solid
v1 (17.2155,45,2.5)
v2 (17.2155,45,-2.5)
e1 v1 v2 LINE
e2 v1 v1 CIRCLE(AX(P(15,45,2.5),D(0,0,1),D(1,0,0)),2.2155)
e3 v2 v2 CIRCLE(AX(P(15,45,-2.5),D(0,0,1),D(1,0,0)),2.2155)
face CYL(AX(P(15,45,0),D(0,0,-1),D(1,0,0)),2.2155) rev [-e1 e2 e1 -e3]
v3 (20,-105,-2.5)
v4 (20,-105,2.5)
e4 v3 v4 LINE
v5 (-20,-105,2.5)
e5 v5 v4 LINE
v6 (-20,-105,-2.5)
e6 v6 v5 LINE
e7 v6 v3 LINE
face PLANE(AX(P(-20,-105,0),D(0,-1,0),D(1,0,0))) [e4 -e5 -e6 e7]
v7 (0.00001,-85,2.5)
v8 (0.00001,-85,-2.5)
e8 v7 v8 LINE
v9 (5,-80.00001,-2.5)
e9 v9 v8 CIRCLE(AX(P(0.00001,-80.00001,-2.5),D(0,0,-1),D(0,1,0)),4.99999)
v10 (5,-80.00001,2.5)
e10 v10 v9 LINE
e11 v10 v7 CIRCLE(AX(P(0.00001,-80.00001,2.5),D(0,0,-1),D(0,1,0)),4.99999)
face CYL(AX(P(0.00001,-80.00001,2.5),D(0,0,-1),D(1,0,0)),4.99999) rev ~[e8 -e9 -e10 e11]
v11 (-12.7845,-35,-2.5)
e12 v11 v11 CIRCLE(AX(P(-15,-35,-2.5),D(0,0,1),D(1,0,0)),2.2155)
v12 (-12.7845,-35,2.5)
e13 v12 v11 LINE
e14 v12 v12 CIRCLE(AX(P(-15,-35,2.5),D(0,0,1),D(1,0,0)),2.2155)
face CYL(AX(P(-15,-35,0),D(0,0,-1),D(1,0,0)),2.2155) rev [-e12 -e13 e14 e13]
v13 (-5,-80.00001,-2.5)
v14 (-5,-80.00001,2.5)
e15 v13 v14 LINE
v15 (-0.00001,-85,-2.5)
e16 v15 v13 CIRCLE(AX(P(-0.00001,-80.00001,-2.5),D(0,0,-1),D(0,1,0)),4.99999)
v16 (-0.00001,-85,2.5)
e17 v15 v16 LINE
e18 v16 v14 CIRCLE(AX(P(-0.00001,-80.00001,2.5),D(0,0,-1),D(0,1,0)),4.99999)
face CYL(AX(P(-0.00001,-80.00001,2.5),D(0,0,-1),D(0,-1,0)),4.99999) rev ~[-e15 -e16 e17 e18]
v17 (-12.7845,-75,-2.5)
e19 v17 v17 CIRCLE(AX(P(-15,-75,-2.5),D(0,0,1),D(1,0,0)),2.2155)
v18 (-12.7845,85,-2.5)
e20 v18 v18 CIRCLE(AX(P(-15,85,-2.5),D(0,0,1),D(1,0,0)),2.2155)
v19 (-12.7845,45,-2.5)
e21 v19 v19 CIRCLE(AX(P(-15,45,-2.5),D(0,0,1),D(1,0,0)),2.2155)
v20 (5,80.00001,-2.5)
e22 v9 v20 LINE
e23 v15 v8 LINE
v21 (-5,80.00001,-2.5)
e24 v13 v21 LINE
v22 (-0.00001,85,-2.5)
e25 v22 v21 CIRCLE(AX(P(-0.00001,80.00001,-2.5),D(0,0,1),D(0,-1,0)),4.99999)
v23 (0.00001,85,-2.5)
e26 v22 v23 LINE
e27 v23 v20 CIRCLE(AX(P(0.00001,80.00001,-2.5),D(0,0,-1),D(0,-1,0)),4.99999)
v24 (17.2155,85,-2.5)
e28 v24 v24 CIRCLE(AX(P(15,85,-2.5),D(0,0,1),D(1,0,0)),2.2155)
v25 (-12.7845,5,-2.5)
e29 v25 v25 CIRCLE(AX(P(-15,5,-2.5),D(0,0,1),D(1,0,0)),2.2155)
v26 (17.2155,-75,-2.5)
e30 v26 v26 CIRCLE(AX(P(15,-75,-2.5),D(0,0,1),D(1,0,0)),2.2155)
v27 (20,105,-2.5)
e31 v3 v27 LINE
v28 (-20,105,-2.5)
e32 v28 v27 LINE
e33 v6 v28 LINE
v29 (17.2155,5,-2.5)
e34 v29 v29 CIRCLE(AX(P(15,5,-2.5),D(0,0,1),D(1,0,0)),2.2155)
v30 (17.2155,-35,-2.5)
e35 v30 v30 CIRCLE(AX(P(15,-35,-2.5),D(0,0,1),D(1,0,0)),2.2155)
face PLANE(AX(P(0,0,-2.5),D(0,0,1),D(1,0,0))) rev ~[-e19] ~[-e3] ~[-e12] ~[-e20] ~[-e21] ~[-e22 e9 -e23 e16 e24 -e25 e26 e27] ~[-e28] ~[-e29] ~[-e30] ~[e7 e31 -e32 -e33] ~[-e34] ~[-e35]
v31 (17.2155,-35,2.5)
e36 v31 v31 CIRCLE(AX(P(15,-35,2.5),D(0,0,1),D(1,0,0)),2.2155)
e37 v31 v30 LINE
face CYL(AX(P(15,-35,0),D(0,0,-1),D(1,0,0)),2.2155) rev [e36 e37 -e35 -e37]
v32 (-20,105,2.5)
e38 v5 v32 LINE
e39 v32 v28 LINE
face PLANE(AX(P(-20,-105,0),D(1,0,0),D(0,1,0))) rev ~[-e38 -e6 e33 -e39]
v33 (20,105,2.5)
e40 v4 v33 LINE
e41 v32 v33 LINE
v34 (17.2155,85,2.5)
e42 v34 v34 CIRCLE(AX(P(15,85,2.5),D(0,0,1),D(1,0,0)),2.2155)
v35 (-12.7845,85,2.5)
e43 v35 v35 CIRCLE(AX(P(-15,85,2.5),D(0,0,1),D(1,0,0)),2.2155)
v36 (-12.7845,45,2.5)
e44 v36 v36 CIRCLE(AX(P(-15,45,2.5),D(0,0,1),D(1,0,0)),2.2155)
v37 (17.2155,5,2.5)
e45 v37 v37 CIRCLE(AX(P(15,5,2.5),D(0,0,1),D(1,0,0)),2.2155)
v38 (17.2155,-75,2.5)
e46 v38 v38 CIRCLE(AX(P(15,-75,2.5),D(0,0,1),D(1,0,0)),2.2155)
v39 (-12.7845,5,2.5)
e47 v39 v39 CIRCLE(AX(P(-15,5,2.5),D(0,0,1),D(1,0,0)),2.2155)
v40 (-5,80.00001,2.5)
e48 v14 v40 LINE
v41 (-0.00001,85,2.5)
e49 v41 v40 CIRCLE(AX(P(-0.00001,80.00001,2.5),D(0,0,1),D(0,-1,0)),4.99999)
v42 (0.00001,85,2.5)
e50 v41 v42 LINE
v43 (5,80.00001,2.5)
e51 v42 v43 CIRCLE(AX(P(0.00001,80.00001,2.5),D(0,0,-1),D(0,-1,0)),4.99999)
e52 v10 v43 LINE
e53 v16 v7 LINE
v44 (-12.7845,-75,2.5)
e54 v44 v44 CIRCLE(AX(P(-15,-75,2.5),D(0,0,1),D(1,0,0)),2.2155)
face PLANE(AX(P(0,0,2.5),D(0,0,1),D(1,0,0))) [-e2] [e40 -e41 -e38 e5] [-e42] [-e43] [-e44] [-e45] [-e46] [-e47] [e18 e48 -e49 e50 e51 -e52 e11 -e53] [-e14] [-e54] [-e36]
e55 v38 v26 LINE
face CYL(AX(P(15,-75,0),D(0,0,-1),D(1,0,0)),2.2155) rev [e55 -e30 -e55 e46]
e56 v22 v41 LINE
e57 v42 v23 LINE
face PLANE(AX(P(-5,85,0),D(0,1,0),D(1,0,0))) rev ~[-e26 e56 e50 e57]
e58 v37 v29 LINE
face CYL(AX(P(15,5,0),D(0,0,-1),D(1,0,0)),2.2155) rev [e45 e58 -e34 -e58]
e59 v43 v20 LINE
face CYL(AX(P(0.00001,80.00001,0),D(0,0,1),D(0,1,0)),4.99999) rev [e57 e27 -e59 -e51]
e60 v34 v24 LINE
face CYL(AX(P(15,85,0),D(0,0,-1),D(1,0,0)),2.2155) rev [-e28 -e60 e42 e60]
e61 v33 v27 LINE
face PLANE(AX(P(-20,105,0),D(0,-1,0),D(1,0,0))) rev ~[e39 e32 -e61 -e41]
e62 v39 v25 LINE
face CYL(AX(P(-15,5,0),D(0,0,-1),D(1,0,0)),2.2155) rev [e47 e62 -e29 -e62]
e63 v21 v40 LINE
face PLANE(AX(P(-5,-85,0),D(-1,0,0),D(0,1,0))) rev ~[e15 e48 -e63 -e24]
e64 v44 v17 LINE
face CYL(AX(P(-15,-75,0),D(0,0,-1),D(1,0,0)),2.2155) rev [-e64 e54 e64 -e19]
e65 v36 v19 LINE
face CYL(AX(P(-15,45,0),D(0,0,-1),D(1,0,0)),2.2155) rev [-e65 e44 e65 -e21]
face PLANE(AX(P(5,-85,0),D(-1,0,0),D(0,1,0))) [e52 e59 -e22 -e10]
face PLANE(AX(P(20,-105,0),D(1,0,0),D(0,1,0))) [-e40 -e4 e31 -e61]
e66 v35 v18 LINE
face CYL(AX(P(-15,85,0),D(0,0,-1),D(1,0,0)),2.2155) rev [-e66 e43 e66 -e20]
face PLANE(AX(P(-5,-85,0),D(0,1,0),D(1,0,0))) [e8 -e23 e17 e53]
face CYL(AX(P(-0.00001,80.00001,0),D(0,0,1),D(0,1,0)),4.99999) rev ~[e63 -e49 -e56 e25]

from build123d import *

# Parameters (mm, degrees)
F0_W          = 40
F0_H          = 210
F0_R          = 2.2155
F0_W_2        = 10
F0_H_2        = 170
F1_DEPTH      = 2.5
F1_DEPTH_BACK = 2.5
F2_R          = 4.99999


# Not quite as in the source:
# - a fillet or chamfer is up to 0.001 mm smaller than in the source, because OpenCascade refuses the exact size


with BuildPart() as f1:
    # F0 (on Top) → F1 (new body, two sides)
    with BuildSketch(Plane.XY) as f1_sk:
        Rectangle(F0_W, F0_H)
        with Locations((-15, -75)):
            Circle(F0_R, mode=Mode.SUBTRACT)
        with Locations((-15, -35)):
            Circle(F0_R, mode=Mode.SUBTRACT)
        with Locations((15, -75)):
            Circle(F0_R, mode=Mode.SUBTRACT)
        with Locations((15, -35)):
            Circle(F0_R, mode=Mode.SUBTRACT)
        with Locations((-15, 5)):
            Circle(F0_R, mode=Mode.SUBTRACT)
        with Locations((-15, 45)):
            Circle(F0_R, mode=Mode.SUBTRACT)
        with Locations((-15, 85)):
            Circle(F0_R, mode=Mode.SUBTRACT)
        Rectangle(F0_W_2, F0_H_2, mode=Mode.SUBTRACT)
        with Locations((15, 5)):
            Circle(F0_R, mode=Mode.SUBTRACT)
        with Locations((15, 45)):
            Circle(F0_R, mode=Mode.SUBTRACT)
        with Locations((15, 85)):
            Circle(F0_R, mode=Mode.SUBTRACT)
    extrude(amount=F1_DEPTH)
    extrude(f1_sk.sketch, amount=-F1_DEPTH_BACK)

    # F2 (radius 5 in the source; OpenCascade refuses exactly that, so slightly less here)
    f2_edges = [f1.edges().sort_by_distance(p)[0] for p in [
        (-5, 85, 0),
        (5, 85, 0),
        (-5, -85, 0),
        (5, -85, 0),
    ]]
    fillet(f2_edges, radius=F2_R)


solid = f1.part
